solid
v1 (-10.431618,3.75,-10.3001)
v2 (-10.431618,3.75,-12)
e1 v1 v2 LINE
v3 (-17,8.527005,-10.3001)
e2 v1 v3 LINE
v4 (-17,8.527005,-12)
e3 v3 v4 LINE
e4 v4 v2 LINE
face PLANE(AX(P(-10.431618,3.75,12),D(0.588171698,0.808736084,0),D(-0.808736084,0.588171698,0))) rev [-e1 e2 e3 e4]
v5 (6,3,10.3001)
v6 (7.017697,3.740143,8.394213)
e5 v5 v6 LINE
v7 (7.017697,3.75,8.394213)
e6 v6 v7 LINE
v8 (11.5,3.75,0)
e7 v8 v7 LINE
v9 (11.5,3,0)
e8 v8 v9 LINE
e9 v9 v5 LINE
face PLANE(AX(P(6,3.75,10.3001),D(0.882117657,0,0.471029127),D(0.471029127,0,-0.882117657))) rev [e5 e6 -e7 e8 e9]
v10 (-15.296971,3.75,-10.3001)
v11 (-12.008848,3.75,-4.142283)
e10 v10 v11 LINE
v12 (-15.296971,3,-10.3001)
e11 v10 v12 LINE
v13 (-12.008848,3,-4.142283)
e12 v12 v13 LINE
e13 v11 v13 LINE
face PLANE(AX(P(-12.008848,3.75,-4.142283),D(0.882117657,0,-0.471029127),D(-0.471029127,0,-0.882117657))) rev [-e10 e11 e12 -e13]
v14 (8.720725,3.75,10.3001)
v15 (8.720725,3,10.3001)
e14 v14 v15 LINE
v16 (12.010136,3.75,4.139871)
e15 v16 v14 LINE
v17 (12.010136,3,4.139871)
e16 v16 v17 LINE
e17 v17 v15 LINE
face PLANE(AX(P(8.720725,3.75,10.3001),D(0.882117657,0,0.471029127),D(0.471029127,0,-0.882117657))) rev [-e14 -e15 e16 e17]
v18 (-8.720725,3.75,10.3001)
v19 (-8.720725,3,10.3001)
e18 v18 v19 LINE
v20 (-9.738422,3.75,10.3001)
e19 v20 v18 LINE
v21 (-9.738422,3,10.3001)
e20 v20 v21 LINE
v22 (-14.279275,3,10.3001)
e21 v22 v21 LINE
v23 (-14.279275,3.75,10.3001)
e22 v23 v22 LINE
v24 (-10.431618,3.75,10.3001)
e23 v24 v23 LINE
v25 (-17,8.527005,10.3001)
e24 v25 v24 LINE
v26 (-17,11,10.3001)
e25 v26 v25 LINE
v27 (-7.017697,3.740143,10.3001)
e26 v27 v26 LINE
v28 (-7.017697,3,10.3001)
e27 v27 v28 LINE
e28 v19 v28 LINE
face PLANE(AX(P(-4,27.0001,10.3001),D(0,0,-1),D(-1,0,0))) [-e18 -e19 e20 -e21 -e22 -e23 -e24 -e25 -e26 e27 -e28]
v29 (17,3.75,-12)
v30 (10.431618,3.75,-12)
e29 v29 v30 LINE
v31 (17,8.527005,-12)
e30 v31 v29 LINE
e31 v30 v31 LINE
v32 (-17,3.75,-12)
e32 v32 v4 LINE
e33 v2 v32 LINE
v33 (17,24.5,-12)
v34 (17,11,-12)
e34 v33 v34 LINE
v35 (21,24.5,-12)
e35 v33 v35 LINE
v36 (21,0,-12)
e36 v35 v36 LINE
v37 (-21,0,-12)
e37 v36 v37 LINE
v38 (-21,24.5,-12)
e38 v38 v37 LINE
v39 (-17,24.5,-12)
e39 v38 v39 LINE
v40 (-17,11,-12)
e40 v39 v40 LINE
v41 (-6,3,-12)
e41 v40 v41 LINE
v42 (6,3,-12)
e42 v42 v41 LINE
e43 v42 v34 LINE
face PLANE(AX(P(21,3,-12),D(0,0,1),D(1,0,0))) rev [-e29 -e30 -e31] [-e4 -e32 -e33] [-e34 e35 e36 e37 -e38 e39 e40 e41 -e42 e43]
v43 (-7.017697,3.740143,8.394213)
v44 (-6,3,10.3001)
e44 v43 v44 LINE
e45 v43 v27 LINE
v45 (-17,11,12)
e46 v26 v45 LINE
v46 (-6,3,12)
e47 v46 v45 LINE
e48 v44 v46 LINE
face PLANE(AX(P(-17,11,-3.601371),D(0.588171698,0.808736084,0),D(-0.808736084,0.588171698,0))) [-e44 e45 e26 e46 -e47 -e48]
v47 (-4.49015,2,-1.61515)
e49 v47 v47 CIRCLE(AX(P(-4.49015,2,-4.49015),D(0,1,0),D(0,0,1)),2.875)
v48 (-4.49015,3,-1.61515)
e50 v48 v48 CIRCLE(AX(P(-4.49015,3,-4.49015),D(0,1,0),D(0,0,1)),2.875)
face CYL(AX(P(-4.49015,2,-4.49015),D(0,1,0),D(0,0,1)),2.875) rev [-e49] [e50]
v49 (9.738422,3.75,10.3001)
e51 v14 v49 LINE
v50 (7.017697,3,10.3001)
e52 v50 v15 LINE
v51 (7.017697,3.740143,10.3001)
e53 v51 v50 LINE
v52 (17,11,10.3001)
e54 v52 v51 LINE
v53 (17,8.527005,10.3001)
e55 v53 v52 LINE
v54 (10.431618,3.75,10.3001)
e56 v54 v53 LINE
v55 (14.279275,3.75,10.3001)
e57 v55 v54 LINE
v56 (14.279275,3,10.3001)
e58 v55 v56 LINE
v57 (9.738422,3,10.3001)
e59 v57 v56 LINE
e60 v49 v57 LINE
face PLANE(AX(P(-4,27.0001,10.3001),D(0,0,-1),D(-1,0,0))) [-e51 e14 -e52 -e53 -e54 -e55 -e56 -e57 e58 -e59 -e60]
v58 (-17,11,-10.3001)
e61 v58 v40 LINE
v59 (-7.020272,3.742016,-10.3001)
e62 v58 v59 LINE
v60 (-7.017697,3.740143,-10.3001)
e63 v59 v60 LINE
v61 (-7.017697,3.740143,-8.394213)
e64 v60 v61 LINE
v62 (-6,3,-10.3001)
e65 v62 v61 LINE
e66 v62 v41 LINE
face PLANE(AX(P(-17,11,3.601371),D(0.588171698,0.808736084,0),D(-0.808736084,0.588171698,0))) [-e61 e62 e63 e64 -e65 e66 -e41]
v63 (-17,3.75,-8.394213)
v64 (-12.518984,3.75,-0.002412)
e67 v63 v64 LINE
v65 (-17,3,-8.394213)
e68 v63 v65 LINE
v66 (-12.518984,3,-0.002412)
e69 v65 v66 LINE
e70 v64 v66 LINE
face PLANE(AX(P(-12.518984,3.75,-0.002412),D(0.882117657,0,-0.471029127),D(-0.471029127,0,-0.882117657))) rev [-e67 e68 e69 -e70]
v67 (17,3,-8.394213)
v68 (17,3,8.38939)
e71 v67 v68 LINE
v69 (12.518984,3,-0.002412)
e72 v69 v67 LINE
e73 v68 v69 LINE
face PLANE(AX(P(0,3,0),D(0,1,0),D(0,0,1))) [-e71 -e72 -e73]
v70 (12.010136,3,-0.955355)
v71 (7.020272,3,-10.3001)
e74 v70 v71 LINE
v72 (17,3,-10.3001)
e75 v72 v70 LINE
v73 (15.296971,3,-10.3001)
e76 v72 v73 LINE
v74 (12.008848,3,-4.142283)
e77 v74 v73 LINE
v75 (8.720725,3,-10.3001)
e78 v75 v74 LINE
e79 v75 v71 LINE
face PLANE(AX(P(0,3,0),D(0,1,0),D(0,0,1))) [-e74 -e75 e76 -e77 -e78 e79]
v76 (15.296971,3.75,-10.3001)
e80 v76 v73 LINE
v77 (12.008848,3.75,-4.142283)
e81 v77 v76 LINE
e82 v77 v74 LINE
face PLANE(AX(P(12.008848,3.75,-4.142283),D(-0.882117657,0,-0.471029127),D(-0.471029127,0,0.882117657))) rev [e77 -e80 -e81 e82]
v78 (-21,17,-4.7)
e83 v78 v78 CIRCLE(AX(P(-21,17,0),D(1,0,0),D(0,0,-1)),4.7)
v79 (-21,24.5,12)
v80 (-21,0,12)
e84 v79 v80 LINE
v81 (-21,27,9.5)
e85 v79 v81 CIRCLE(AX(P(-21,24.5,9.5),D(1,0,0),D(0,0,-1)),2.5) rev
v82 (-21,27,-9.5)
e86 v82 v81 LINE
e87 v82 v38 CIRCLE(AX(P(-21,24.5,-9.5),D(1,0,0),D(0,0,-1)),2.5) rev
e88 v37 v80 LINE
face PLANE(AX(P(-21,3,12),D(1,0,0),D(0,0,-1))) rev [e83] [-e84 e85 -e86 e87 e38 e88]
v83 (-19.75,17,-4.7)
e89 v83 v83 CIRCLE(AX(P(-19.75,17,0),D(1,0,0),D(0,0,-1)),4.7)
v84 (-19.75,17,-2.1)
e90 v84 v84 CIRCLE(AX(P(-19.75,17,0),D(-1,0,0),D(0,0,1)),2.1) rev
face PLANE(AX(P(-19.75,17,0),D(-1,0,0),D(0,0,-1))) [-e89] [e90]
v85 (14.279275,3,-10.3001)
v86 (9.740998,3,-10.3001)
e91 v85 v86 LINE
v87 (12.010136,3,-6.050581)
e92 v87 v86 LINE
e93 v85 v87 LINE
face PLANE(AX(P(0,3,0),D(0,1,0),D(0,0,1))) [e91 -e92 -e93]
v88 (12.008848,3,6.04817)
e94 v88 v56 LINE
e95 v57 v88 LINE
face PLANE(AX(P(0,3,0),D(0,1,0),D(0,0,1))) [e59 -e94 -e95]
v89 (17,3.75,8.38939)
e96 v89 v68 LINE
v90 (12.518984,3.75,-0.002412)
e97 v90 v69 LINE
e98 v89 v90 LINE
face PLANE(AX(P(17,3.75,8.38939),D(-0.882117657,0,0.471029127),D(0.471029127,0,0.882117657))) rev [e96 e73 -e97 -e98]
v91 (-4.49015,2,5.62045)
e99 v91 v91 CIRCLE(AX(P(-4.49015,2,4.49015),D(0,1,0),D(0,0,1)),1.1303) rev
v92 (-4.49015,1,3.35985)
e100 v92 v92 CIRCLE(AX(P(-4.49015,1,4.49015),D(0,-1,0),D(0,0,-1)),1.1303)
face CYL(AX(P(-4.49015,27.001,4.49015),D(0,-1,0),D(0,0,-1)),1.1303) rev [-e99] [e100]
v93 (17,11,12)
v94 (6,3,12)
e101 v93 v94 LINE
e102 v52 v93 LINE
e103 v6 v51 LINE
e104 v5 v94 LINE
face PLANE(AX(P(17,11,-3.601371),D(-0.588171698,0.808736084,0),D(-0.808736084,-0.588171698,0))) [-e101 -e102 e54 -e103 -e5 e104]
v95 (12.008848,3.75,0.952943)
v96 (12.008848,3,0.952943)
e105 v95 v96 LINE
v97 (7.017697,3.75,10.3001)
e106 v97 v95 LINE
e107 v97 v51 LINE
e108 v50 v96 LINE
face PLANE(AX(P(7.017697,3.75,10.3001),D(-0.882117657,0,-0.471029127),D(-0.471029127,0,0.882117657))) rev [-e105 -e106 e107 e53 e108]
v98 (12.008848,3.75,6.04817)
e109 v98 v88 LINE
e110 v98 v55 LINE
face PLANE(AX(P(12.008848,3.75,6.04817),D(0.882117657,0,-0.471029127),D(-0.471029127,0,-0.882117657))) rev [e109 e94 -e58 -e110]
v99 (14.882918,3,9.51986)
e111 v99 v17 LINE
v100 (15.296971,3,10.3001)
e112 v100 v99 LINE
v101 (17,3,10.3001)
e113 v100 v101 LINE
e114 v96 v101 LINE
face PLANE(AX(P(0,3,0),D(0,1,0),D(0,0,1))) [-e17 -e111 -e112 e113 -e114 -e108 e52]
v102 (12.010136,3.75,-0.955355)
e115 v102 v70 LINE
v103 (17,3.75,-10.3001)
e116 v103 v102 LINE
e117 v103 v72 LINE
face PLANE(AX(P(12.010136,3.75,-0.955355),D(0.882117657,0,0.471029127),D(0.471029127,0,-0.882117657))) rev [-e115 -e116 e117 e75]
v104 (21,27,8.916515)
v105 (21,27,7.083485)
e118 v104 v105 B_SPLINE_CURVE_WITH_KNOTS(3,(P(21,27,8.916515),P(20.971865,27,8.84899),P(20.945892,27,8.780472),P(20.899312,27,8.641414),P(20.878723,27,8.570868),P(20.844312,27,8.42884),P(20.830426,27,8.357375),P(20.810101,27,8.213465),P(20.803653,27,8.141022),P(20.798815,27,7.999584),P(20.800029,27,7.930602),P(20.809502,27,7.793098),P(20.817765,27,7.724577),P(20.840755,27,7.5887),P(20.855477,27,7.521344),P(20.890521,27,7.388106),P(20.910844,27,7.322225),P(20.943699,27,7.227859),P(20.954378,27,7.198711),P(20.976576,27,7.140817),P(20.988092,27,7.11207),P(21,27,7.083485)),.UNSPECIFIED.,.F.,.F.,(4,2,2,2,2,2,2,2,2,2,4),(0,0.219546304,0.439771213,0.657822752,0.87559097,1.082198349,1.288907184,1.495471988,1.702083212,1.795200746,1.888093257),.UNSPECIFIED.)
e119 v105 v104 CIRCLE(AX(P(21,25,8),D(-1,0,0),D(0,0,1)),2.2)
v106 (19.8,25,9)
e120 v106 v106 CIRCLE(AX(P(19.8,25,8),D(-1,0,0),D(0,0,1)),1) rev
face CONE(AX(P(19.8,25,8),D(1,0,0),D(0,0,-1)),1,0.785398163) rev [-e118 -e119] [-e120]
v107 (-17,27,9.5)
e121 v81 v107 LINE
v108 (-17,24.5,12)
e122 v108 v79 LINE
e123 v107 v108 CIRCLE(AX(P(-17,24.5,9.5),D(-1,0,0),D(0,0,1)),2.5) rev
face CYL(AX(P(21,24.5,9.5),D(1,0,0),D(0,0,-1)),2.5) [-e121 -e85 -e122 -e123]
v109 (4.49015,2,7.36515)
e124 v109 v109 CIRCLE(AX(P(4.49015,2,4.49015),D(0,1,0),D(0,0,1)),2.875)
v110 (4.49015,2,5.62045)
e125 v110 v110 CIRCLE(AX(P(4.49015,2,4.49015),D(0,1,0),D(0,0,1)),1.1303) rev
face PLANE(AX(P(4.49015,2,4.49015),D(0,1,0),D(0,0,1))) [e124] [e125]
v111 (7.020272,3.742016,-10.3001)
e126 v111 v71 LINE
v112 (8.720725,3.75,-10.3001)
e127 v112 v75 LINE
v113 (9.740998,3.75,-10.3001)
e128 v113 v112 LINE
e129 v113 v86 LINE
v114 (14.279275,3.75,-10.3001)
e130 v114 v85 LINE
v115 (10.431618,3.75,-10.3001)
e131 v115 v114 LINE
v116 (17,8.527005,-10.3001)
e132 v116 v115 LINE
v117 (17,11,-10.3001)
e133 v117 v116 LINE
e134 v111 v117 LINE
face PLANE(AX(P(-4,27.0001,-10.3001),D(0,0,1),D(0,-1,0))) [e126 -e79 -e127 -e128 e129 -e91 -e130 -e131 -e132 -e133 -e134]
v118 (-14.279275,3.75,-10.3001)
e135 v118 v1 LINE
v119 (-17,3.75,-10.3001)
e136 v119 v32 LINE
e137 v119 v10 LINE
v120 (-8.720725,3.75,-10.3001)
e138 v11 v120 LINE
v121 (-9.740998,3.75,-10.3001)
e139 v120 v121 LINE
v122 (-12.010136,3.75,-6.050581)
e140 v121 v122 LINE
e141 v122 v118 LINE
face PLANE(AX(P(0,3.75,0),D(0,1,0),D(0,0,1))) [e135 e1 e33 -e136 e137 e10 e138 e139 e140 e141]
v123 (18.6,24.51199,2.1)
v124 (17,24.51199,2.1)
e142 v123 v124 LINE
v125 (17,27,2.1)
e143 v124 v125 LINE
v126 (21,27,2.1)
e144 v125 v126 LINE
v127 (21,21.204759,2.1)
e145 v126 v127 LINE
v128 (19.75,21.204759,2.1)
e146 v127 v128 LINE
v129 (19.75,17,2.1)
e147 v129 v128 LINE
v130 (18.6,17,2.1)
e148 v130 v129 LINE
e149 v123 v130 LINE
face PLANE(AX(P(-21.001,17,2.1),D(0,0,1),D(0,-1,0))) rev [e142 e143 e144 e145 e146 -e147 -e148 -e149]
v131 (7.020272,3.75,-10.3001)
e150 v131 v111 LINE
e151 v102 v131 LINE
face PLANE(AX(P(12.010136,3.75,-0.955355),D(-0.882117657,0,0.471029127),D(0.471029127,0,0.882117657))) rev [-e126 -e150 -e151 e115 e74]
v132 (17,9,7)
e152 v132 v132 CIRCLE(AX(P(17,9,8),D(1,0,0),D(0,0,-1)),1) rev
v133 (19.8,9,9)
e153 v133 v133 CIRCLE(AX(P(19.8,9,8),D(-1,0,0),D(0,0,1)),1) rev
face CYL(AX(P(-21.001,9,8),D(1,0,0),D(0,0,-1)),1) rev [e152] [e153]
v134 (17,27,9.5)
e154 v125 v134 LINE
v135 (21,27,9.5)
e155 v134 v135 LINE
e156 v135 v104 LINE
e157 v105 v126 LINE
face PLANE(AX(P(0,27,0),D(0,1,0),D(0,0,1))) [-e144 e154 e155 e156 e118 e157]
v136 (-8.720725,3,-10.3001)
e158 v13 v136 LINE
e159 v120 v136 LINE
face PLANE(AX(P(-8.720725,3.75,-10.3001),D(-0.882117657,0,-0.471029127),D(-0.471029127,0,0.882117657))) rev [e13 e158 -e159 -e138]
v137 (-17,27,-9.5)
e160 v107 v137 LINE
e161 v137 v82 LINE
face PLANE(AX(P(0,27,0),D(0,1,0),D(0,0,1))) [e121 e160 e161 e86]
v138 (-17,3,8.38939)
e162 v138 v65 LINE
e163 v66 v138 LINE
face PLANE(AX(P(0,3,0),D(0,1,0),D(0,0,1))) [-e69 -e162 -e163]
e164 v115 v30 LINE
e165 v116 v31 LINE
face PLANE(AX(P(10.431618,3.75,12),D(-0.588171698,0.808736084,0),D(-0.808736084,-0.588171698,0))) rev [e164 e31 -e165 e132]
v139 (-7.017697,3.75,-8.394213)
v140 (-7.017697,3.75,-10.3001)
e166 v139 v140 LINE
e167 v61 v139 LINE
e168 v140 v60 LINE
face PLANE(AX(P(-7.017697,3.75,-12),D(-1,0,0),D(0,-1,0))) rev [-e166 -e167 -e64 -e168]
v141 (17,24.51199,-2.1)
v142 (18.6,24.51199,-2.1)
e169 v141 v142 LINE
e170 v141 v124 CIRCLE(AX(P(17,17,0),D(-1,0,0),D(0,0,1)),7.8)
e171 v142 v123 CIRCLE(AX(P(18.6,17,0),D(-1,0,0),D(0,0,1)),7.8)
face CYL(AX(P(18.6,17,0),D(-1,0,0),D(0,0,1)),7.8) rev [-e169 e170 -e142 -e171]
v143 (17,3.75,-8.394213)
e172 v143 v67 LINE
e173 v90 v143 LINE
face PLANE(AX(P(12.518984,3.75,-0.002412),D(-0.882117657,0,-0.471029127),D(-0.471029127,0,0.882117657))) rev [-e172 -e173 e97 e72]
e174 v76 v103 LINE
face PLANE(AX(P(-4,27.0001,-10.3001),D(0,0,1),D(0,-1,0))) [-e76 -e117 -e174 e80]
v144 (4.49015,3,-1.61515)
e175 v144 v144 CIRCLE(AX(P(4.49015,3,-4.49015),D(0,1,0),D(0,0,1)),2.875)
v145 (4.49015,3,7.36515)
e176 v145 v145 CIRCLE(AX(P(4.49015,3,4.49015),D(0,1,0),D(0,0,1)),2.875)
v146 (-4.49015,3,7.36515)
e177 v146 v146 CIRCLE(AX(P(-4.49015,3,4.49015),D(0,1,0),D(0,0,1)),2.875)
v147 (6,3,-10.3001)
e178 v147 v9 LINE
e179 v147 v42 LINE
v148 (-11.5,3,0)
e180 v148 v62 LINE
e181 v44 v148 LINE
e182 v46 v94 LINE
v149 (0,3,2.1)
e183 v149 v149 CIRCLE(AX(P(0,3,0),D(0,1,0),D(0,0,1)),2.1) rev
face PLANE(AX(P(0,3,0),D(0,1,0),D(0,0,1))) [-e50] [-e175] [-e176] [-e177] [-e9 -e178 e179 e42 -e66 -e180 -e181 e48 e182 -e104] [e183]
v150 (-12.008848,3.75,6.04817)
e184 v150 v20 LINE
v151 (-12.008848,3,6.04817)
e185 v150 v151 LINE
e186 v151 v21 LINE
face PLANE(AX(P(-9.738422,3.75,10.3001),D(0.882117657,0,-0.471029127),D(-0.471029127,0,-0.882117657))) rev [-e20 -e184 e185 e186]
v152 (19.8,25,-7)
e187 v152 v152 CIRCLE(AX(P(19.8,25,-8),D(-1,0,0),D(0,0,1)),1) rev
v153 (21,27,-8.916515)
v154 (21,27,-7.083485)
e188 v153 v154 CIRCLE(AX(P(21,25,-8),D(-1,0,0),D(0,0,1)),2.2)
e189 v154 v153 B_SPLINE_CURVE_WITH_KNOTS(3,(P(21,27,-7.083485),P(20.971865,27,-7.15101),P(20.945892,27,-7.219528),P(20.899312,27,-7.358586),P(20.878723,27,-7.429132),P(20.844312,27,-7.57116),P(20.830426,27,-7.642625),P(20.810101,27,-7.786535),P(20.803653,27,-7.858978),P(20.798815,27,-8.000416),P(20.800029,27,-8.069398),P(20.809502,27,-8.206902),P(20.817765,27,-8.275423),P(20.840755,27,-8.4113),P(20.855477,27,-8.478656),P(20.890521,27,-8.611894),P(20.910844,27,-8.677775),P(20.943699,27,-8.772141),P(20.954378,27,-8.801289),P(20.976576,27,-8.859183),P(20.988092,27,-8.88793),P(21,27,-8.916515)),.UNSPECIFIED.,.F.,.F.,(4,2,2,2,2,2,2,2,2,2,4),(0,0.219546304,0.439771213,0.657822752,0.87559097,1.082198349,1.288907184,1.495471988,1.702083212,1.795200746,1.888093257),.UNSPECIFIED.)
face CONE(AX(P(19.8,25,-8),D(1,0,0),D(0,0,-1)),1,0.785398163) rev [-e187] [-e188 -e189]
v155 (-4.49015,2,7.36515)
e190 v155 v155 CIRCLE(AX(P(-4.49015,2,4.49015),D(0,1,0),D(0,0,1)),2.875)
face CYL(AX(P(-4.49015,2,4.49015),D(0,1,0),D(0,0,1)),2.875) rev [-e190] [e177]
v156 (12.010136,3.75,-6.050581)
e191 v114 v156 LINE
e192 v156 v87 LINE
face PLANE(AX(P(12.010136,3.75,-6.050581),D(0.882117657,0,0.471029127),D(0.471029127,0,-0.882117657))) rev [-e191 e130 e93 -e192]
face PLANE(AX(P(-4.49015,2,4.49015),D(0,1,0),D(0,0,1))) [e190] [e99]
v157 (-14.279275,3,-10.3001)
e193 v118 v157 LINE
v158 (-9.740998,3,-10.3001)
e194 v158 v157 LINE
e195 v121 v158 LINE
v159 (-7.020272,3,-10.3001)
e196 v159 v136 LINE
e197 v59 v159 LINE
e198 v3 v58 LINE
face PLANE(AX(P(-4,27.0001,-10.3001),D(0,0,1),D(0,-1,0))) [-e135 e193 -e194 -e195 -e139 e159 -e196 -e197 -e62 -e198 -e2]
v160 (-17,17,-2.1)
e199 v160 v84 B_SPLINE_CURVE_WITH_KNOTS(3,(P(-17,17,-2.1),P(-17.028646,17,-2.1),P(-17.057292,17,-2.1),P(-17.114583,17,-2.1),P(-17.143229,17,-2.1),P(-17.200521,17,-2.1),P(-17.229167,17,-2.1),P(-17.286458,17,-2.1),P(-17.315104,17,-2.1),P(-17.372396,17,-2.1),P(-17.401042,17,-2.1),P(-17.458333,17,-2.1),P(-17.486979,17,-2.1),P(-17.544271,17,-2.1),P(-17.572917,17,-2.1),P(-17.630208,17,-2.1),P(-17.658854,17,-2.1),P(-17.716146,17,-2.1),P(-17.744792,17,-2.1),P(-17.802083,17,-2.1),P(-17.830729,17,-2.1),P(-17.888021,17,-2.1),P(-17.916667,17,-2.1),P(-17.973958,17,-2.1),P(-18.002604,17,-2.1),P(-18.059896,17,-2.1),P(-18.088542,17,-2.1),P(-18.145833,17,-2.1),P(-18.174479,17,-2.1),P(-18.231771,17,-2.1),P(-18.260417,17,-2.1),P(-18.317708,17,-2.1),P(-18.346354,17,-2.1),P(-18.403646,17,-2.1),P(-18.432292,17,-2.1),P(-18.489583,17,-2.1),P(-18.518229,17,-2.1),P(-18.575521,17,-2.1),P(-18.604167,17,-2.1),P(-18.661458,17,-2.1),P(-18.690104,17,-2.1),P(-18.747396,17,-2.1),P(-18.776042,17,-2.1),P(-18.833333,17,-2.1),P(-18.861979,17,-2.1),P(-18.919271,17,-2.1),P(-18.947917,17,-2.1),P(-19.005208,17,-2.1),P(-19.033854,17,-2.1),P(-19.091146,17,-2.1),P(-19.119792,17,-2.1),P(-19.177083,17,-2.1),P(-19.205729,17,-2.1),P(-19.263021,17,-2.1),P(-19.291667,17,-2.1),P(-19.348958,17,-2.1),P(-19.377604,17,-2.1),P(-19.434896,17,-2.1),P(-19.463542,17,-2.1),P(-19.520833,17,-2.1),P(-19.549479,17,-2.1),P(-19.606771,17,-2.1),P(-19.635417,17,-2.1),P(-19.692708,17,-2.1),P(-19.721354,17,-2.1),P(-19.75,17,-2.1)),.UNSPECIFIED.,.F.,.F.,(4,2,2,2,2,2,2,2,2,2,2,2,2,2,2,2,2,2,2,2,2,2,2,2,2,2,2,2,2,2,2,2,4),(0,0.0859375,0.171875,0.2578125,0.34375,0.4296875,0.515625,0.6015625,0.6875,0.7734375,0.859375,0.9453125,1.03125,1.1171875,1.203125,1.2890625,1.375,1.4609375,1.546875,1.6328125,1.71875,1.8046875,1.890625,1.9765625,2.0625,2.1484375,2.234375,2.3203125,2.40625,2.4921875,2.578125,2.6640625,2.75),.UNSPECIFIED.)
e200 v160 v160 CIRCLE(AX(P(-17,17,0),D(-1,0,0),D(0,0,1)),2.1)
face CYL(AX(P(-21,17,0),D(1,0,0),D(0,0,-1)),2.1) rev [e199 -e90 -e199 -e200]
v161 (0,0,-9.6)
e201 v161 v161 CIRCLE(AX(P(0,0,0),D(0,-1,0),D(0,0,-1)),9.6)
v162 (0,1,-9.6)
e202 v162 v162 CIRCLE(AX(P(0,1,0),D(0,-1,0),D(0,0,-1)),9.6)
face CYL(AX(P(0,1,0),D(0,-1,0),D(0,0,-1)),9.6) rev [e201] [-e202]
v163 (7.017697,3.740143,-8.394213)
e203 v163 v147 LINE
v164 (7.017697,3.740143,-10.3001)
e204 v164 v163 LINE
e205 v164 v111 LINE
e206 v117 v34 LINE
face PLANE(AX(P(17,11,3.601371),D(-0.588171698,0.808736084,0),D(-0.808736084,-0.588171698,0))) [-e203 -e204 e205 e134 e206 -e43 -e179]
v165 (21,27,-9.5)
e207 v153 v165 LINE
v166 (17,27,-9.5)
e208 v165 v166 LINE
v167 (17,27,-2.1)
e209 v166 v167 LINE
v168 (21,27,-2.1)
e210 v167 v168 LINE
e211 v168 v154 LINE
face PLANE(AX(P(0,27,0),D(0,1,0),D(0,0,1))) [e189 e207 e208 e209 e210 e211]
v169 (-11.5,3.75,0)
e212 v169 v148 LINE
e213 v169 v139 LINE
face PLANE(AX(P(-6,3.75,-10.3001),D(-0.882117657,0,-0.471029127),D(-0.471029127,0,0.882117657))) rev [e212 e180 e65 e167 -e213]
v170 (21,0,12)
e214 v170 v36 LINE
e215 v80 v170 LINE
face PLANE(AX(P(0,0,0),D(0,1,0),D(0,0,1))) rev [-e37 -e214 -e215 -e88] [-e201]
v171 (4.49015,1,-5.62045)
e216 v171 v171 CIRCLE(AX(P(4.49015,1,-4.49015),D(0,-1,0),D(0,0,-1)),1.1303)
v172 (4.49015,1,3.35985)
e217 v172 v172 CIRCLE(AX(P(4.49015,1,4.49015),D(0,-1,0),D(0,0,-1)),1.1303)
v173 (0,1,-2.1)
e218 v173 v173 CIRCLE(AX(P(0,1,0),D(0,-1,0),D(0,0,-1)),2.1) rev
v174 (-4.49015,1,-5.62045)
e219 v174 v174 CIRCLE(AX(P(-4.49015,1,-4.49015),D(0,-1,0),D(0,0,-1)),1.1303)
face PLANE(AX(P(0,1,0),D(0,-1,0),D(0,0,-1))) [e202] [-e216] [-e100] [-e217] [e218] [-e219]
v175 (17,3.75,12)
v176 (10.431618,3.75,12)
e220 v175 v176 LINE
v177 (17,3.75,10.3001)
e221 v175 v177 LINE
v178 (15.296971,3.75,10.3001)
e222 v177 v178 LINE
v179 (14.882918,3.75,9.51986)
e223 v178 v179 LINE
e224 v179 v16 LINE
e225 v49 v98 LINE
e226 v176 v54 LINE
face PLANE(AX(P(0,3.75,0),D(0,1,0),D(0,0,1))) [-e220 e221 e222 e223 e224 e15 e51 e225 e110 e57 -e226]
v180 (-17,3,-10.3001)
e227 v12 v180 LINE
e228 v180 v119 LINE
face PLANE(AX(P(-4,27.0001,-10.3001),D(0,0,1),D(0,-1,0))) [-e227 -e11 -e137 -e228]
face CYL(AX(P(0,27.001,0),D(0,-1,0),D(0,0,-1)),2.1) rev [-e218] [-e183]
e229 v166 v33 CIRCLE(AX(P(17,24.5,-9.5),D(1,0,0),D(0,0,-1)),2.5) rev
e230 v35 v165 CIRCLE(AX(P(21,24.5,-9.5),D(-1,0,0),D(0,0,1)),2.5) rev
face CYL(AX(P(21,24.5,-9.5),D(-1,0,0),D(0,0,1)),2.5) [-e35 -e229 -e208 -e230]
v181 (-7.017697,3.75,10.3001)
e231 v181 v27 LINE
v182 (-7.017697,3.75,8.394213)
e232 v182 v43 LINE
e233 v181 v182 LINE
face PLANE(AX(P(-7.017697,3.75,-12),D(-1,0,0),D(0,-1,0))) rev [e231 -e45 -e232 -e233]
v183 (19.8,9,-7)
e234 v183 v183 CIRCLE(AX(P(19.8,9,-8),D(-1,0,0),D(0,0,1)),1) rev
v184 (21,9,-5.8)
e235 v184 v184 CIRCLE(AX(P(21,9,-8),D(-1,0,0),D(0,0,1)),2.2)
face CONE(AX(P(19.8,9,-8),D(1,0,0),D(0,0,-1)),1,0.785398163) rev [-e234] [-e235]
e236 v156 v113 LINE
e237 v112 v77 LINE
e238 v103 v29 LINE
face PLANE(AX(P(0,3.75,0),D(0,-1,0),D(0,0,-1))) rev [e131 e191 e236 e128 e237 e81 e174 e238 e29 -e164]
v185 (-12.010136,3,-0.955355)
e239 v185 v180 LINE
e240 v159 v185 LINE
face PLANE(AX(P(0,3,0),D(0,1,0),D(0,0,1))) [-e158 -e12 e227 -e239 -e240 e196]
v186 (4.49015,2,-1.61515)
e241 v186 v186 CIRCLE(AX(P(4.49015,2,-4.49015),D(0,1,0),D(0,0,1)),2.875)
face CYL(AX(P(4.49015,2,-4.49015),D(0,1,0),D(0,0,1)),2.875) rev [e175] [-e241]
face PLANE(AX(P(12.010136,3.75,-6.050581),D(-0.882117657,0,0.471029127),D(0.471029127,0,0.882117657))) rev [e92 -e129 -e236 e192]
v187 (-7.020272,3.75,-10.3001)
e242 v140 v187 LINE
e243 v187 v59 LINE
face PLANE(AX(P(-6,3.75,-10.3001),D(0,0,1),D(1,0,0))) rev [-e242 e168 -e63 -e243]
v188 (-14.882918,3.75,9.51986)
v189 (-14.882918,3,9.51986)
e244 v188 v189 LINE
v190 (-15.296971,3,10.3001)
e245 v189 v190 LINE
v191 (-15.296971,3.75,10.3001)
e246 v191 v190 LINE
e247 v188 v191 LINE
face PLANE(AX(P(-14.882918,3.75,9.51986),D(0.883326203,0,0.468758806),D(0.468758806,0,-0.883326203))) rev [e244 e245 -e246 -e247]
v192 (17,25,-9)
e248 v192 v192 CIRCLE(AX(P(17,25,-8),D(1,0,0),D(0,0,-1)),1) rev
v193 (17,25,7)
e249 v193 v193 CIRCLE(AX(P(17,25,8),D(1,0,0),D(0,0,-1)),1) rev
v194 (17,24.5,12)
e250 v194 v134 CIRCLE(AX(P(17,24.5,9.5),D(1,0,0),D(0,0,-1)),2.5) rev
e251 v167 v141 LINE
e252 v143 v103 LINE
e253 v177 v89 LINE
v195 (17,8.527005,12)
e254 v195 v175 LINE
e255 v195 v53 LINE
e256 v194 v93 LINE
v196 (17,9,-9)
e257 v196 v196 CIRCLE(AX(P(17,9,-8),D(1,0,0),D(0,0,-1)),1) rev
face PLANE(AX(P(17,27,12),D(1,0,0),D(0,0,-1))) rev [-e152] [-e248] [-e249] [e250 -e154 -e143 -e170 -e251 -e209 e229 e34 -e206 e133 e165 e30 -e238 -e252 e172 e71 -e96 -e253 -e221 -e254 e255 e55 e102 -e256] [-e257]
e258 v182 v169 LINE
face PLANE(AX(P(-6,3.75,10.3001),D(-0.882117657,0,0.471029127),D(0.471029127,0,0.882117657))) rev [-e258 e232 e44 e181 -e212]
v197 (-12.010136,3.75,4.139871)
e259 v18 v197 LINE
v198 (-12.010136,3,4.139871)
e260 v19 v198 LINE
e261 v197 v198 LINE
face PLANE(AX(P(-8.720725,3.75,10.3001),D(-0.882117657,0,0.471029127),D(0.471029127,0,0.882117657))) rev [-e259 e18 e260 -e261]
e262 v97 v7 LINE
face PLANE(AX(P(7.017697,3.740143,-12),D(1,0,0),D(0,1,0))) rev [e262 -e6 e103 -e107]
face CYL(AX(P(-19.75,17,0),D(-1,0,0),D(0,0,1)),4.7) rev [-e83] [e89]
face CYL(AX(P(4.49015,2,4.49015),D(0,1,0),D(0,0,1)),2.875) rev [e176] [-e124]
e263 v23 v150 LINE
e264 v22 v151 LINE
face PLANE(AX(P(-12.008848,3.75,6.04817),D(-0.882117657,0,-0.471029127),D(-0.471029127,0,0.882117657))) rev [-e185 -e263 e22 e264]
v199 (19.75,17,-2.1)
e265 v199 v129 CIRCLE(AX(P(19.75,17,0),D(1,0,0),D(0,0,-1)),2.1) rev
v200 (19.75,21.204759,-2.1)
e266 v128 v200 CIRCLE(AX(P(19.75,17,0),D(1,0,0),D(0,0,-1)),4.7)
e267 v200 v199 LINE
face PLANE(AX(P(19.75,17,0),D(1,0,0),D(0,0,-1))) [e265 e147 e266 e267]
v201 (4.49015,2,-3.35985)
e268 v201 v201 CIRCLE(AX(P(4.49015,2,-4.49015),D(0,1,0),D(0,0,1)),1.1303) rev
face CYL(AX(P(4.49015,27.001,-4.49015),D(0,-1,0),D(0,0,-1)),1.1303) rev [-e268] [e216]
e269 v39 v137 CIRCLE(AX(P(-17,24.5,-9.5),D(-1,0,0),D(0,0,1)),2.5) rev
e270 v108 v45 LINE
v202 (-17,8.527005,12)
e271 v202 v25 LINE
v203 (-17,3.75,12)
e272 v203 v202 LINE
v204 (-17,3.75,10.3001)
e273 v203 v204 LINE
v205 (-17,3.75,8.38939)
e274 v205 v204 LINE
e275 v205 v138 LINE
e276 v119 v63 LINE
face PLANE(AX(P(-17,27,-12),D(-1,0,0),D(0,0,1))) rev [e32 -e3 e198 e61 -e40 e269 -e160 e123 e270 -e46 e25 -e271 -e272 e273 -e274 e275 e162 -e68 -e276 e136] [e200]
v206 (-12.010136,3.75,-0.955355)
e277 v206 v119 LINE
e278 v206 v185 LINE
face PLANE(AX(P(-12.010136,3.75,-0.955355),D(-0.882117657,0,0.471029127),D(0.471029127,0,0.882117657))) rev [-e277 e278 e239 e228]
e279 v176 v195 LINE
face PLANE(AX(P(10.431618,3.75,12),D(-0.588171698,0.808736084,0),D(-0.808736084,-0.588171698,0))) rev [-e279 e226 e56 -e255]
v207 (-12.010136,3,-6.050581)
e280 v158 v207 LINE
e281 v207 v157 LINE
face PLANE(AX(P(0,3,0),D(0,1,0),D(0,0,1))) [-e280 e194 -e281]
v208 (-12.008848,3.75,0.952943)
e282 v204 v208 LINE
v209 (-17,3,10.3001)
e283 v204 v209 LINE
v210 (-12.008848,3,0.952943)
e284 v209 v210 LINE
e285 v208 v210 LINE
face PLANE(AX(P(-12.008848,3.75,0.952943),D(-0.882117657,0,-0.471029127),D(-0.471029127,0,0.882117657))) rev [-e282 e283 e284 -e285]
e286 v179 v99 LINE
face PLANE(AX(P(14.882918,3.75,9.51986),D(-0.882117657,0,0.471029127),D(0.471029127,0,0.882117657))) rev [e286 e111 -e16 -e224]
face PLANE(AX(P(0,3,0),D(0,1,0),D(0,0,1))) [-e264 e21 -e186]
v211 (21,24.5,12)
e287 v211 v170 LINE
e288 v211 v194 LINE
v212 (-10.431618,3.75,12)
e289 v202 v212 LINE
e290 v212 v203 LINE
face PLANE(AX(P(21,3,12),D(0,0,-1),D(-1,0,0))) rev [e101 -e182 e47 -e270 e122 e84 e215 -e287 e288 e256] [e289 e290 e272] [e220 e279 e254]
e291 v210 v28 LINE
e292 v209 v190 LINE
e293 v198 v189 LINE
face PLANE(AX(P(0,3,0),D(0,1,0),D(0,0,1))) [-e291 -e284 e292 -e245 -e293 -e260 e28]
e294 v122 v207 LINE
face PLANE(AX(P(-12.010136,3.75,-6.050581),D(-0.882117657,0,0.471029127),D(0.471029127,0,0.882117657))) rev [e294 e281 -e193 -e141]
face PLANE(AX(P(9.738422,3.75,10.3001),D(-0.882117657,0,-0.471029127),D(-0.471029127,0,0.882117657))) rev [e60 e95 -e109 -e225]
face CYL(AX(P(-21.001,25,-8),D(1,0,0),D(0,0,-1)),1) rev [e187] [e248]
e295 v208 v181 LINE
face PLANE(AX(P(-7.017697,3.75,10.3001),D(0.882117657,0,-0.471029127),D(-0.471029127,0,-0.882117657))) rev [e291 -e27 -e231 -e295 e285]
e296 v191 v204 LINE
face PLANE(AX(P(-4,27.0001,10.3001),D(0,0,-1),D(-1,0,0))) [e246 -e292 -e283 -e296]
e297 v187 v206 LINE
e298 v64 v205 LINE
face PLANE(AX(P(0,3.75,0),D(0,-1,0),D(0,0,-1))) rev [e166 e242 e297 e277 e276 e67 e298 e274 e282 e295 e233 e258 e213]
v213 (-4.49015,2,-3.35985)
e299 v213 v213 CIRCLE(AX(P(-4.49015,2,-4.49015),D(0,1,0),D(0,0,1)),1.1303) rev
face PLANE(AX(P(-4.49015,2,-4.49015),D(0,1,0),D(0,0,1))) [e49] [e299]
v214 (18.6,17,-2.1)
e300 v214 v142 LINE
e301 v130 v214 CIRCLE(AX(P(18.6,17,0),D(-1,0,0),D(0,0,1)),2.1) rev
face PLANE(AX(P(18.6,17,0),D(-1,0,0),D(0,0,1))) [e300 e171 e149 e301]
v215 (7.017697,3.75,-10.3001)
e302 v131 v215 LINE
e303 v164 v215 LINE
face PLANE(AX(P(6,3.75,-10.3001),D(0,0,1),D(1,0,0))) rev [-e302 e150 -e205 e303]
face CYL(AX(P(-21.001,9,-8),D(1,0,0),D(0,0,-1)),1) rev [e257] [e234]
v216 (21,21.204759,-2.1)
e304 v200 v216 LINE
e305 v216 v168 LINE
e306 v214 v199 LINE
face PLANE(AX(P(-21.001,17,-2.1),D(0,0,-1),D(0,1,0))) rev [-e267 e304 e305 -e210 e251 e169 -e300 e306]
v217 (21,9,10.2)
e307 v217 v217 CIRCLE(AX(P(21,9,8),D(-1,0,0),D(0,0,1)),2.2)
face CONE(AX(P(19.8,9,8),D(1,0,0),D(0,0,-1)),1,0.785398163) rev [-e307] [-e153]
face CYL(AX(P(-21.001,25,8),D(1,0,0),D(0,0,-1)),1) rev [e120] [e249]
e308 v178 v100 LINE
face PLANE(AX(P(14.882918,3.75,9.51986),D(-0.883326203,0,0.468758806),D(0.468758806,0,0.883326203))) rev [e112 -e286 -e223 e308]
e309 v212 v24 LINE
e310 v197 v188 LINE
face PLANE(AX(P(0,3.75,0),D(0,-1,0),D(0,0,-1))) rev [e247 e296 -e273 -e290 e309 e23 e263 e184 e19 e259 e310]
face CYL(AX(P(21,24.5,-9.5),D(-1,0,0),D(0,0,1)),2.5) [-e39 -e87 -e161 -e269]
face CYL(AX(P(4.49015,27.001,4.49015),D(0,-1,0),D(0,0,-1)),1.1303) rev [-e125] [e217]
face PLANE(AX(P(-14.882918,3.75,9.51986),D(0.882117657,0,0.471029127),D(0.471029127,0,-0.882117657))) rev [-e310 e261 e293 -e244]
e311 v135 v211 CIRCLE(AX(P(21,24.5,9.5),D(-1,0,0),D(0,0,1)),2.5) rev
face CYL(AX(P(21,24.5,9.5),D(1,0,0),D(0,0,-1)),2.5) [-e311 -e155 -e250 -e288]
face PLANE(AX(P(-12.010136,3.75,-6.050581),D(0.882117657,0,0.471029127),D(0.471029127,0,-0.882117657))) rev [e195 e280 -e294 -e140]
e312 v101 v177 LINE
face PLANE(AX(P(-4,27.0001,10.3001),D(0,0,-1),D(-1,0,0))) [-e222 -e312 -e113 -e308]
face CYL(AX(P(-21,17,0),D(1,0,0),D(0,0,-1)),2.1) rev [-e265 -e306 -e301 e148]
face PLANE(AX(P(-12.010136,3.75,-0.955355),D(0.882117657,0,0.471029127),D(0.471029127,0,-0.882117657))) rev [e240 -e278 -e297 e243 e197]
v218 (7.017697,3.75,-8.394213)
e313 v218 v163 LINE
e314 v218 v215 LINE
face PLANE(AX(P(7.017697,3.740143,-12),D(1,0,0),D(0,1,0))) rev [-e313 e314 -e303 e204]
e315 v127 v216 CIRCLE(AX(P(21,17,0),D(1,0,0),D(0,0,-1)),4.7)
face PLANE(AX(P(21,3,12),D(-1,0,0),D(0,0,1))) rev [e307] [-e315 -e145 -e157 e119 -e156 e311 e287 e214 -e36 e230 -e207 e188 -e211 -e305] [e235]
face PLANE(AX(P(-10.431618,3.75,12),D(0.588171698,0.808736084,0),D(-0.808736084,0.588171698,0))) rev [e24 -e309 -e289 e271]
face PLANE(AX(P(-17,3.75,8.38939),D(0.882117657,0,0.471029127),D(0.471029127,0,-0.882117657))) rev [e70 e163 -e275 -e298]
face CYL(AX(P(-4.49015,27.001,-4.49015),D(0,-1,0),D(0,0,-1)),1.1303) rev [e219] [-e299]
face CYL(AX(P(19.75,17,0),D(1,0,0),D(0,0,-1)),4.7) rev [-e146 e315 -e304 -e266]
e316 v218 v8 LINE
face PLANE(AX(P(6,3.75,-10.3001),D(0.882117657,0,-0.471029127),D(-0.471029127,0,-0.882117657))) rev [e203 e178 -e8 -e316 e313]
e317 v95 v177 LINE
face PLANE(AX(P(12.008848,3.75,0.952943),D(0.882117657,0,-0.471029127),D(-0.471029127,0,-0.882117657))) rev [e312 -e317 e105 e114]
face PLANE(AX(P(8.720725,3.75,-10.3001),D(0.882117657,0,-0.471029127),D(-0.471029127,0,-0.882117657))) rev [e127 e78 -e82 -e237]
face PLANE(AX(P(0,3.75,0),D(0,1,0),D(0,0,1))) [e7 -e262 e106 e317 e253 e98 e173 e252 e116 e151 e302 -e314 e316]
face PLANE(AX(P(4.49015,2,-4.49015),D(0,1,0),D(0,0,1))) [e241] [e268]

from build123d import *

# Parameters (mm, degrees)
SKETCH1_W           = 42
SKETCH1_H           = 24
BOSS_EXTRUDE1_DEPTH = 3
SKETCH2_W           = 4
SKETCH2_H           = 24
BOSS_EXTRUDE2_DEPTH = 24
SKETCH3_R           = 2.1
CUT_EXTRUDE1_DEPTH  = 52.351728306
SKETCH4_R           = 7.8
CUT_EXTRUDE2_DEPTH  = 1.6
CUT_EXTRUDE3_REACH  = 53.352
SKETCH5_R           = 1
CHAMFER1_SIZE       = 1.2
FILLET1_R           = 2.5
FILLET2_R           = 2.5
FILLET3_R           = 2.5
FILLET4_R           = 2.5
CUT_EXTRUDE4_REACH  = 38.249
SKETCH6_R           = 2.1
SKETCH7_R           = 4.7
CUT_EXTRUDE5_DEPTH  = 1.25
BOSS_EXTRUDE3_DEPTH = 1.6999
CUT_EXTRUDE6_REACH  = 53.352
BOSS_EXTRUDE4_DEPTH = 1.6999
SKETCH12_R          = 9.6
CUT_EXTRUDE7_DEPTH  = 1
CUT_EXTRUDE8_REACH  = 37.511
SKETCH13_R          = 1.1303
BOSS_EXTRUDE5_DEPTH = 0.75
CUT_EXTRUDE9_DEPTH  = 41.832517189
CUT_EXTRUDE10_DEPTH = 41.832517189
CUT_EXTRUDE11_DEPTH = 42.785164832
SKETCH19_R          = 2.875
CUT_EXTRUDE12_DEPTH = 1


with BuildPart() as part:
    # Sketch1 → Boss-Extrude1 (new body)
    with BuildSketch(Plane(origin=(0, 0, 0), x_dir=(1, 0, 0), z_dir=(0, 1, 0))):
        Rectangle(SKETCH1_W, SKETCH1_H)
    extrude(amount=BOSS_EXTRUDE1_DEPTH)

    # Sketch2 → Boss-Extrude2 (add)
    with BuildSketch(Plane(origin=(0, 3, 0), x_dir=(1, 0, 0), z_dir=(0, 1, 0))):
        with Locations((19, 0)):
            Rectangle(SKETCH2_W, SKETCH2_H)
        with Locations((-19, 0)):
            Rectangle(SKETCH2_W, SKETCH2_H)
    extrude(amount=BOSS_EXTRUDE2_DEPTH)

    # Sketch3 → Cut-Extrude1 (cut, through all)
    with BuildSketch(Plane(origin=(21, 0, 0), x_dir=(0, 0, -1), z_dir=(1, 0, 0))):
        with Locations((0, 17)):
            Circle(SKETCH3_R)
    extrude(amount=-CUT_EXTRUDE1_DEPTH, mode=Mode.SUBTRACT)

    # Sketch4 → Cut-Extrude2 (cut)
    with BuildSketch(Plane.ZY.offset(-17)):
        with Locations((0, 17)):
            Circle(SKETCH4_R)
    extrude(amount=-CUT_EXTRUDE2_DEPTH, mode=Mode.SUBTRACT)

    # Sketch5 → Cut-Extrude3 (cut, up to next)
    with BuildSketch(Plane(origin=(21, 0, 0), x_dir=(0, 0, -1), z_dir=(1, 0, 0)), mode=Mode.PRIVATE) as cut_extrude3_sk1:
        with Locations((-8, 25)):
            Circle(SKETCH5_R)
    cut_extrude3_tool1 = extrude(cut_extrude3_sk1.sketch, amount=-CUT_EXTRUDE3_REACH, mode=Mode.PRIVATE) & part.part
    # Sketch5 → Cut-Extrude3 (cut, up to next)
    with BuildSketch(Plane(origin=(21, 0, 0), x_dir=(0, 0, -1), z_dir=(1, 0, 0)), mode=Mode.PRIVATE) as cut_extrude3_sk2:
        with Locations((8, 25)):
            Circle(SKETCH5_R)
    cut_extrude3_tool2 = extrude(cut_extrude3_sk2.sketch, amount=-CUT_EXTRUDE3_REACH, mode=Mode.PRIVATE) & part.part
    # Sketch5 → Cut-Extrude3 (cut, up to next)
    with BuildSketch(Plane(origin=(21, 0, 0), x_dir=(0, 0, -1), z_dir=(1, 0, 0)), mode=Mode.PRIVATE) as cut_extrude3_sk3:
        with Locations((8, 9)):
            Circle(SKETCH5_R)
    cut_extrude3_tool3 = extrude(cut_extrude3_sk3.sketch, amount=-CUT_EXTRUDE3_REACH, mode=Mode.PRIVATE) & part.part
    # Sketch5 → Cut-Extrude3 (cut, up to next)
    with BuildSketch(Plane(origin=(21, 0, 0), x_dir=(0, 0, -1), z_dir=(1, 0, 0)), mode=Mode.PRIVATE) as cut_extrude3_sk4:
        with Locations((-8, 9)):
            Circle(SKETCH5_R)
    cut_extrude3_tool4 = extrude(cut_extrude3_sk4.sketch, amount=-CUT_EXTRUDE3_REACH, mode=Mode.PRIVATE) & part.part
    add(cut_extrude3_tool1.solids().sort_by_distance((21, 25, 8))[0], mode=Mode.SUBTRACT)
    add(cut_extrude3_tool2.solids().sort_by_distance((21, 25, -8))[0], mode=Mode.SUBTRACT)
    add(cut_extrude3_tool3.solids().sort_by_distance((21, 9, -8))[0], mode=Mode.SUBTRACT)
    add(cut_extrude3_tool4.solids().sort_by_distance((21, 9, 8))[0], mode=Mode.SUBTRACT)

    # Chamfer1
    # the kernel refuses this chamfer: 1.2 mm, written as the material it takes off along each edge
    with BuildSketch(Plane(origin=(21, 9, 8), x_dir=(0, 0, -1), z_dir=(0, -1, 0))) as chamfer1_piece_1:
        Polygon((1 + CHAMFER1_SIZE, 0), (1, -CHAMFER1_SIZE), (1, 0), align=None)
    revolve(axis=Axis((21, 9, 8), (1, 0, 0)), mode=Mode.SUBTRACT)
    with BuildSketch(Plane(origin=(21, 9, -8), x_dir=(0, 0, -1), z_dir=(0, -1, 0))) as chamfer1_piece_2:
        Polygon((1 + CHAMFER1_SIZE, 0), (1, -CHAMFER1_SIZE), (1, 0), align=None)
    revolve(axis=Axis((21, 9, -8), (1, 0, 0)), mode=Mode.SUBTRACT)
    with BuildSketch(Plane(origin=(21, 25, -8), x_dir=(0, 0, -1), z_dir=(0, -1, 0))) as chamfer1_piece_3:
        Polygon((1 + CHAMFER1_SIZE, 0), (1, -CHAMFER1_SIZE), (1, 0), align=None)
    revolve(axis=Axis((21, 25, -8), (1, 0, 0)), mode=Mode.SUBTRACT)
    with BuildSketch(Plane(origin=(21, 25, 8), x_dir=(0, 0, -1), z_dir=(0, -1, 0))) as chamfer1_piece_4:
        Polygon((1 + CHAMFER1_SIZE, 0), (1, -CHAMFER1_SIZE), (1, 0), align=None)
    revolve(axis=Axis((21, 25, 8), (1, 0, 0)), mode=Mode.SUBTRACT)

    # Fillet1
    fillet1_edges = [part.edges().sort_by_distance(p)[0] for p in [
        (19, 27, 12),
    ]]
    fillet(fillet1_edges, radius=FILLET1_R)

    # Fillet2
    fillet2_edges = [part.edges().sort_by_distance(p)[0] for p in [
        (19, 27, -12),
    ]]
    fillet(fillet2_edges, radius=FILLET2_R)

    # Fillet3
    fillet3_edges = [part.edges().sort_by_distance(p)[0] for p in [
        (-19, 27, -12),
    ]]
    fillet(fillet3_edges, radius=FILLET3_R)

    # Fillet4
    fillet4_edges = [part.edges().sort_by_distance(p)[0] for p in [
        (-19, 27, 12),
    ]]
    fillet(fillet4_edges, radius=FILLET4_R)

    # Sketch6 → Cut-Extrude4 (cut, up to next)
    with BuildSketch(Plane.XZ, mode=Mode.PRIVATE) as cut_extrude4_sk1:
        with Locations(Location((0, 0, 0), (0, 0, 270))):
            Circle(SKETCH6_R)
    cut_extrude4_tool1 = extrude(cut_extrude4_sk1.sketch, amount=-CUT_EXTRUDE4_REACH, mode=Mode.PRIVATE) & part.part
    add(cut_extrude4_tool1.solids().sort_by_distance((0, 0, 0))[0], mode=Mode.SUBTRACT)

    # Sketch7 → Cut-Extrude5 (cut)
    with BuildSketch(Plane(origin=(21, 0, 0), x_dir=(0, 0, -1), z_dir=(1, 0, 0))):
        with Locations((0, 17)):
            Circle(SKETCH7_R)
    cut_extrude5 = extrude(amount=-CUT_EXTRUDE5_DEPTH, mode=Mode.SUBTRACT)

    # Mirror1: Cut-Extrude5 across plane
    add(cut_extrude5.mirror(Plane(origin=(0, 0, 0), x_dir=(0, 0, 1), z_dir=(1, 0, 0))), mode=Mode.SUBTRACT)

    # Sketch9 → Boss-Extrude3 (add)
    with BuildSketch(Plane.XY.offset(12)):
        Polygon((-17, 3), (-17, 11), (-6, 3), align=None)
        Polygon((17, 11), (6, 3), (17, 3), align=None)
    extrude(amount=-BOSS_EXTRUDE3_DEPTH)

    # Sketch10 → Cut-Extrude6 (cut, up to next)
    with BuildSketch(Plane(origin=(21, 0, 0), x_dir=(0, 0, -1), z_dir=(1, 0, 0)), mode=Mode.PRIVATE) as cut_extrude6_sk1:
        with BuildLine():
            Line((2.1, 17), (2.1, 27))
            Line((2.1, 27), (-2.1, 27))
            Line((-2.1, 27), (-2.1, 17))
            ThreePointArc((-2.1, 17), (0, 14.9), (2.1, 17))
        make_face()
    cut_extrude6_tool1 = extrude(cut_extrude6_sk1.sketch, amount=-CUT_EXTRUDE6_REACH, mode=Mode.PRIVATE) & part.part
    add(cut_extrude6_tool1.solids().sort_by_distance((21, 21.165903, 0))[0], mode=Mode.SUBTRACT)

    # Sketch11 → Boss-Extrude4 (add)
    with BuildSketch(Plane(origin=(0, 0, -12), x_dir=(-1, 0, 0), z_dir=(0, 0, -1))):
        Polygon((-17, 3), (-17, 11), (-6, 3), align=None)
        Polygon((17, 11), (6, 3), (17, 3), align=None)
    extrude(amount=-BOSS_EXTRUDE4_DEPTH)

    # Sketch12 → Cut-Extrude7 (cut)
    with BuildSketch(Plane.XZ):
        with Locations(Location((0, 0, 0), (0, 0, 270))):
            Circle(SKETCH12_R)
    extrude(amount=-CUT_EXTRUDE7_DEPTH, mode=Mode.SUBTRACT)

    # Sketch13 → Cut-Extrude8 (cut, up to next)
    with BuildSketch(Plane.XZ.offset(-1), mode=Mode.PRIVATE) as cut_extrude8_sk1:
        with Locations(Location((-4.49015, 4.49015, 0), (0, 0, 270))):
            Circle(SKETCH13_R)
    cut_extrude8_tool1 = extrude(cut_extrude8_sk1.sketch, amount=-CUT_EXTRUDE8_REACH, mode=Mode.PRIVATE) & part.part
    # Sketch13 → Cut-Extrude8 (cut, up to next)
    with BuildSketch(Plane.XZ.offset(-1), mode=Mode.PRIVATE) as cut_extrude8_sk2:
        with Locations(Location((4.49015, 4.49015, 0), (0, 0, 270))):
            Circle(SKETCH13_R)
    cut_extrude8_tool2 = extrude(cut_extrude8_sk2.sketch, amount=-CUT_EXTRUDE8_REACH, mode=Mode.PRIVATE) & part.part
    # Sketch13 → Cut-Extrude8 (cut, up to next)
    with BuildSketch(Plane.XZ.offset(-1), mode=Mode.PRIVATE) as cut_extrude8_sk3:
        with Locations(Location((4.49015, -4.49015, 0), (0, 0, 270))):
            Circle(SKETCH13_R)
    cut_extrude8_tool3 = extrude(cut_extrude8_sk3.sketch, amount=-CUT_EXTRUDE8_REACH, mode=Mode.PRIVATE) & part.part
    # Sketch13 → Cut-Extrude8 (cut, up to next)
    with BuildSketch(Plane.XZ.offset(-1), mode=Mode.PRIVATE) as cut_extrude8_sk4:
        with Locations(Location((-4.49015, -4.49015, 0), (0, 0, 270))):
            Circle(SKETCH13_R)
    cut_extrude8_tool4 = extrude(cut_extrude8_sk4.sketch, amount=-CUT_EXTRUDE8_REACH, mode=Mode.PRIVATE) & part.part
    add(cut_extrude8_tool1.solids().sort_by_distance((-4.49015, 1, 4.49015))[0], mode=Mode.SUBTRACT)
    add(cut_extrude8_tool2.solids().sort_by_distance((4.49015, 1, 4.49015))[0], mode=Mode.SUBTRACT)
    add(cut_extrude8_tool3.solids().sort_by_distance((4.49015, 1, -4.49015))[0], mode=Mode.SUBTRACT)
    add(cut_extrude8_tool4.solids().sort_by_distance((-4.49015, 1, -4.49015))[0], mode=Mode.SUBTRACT)

    # Sketch14 → Boss-Extrude5 (add)
    with BuildSketch(Plane(origin=(0, 3, 0), x_dir=(1, 0, 0), z_dir=(0, 1, 0))):
        Polygon((-6, 10.3001), (-11.5, 0), (-6, -10.3001), (-7.01769667, -10.3001), (-12.008848335, -0.952943406), (-17, -10.3001), (-17, -8.389390136), (-12.518984365, 0.002411526), (-17, 8.394213188), (-17, 10.3001), (-12.01013603, 0.955354932), (-7.020272061, 10.3001), align=None)
        Polygon((-9.738422165, -10.3001), (-12.008848335, -6.048169711), (-14.279274505, -10.3001), (-15.296971174, -10.3001), (-14.882917623, -9.519860041), (-12.01013603, -4.139871373), (-8.720725495, -10.3001), align=None)
        Polygon((-8.720725495, 10.3001), (-9.740997556, 10.3001), (-12.01013603, 6.050581237), (-14.279274505, 10.3001), (-15.296971174, 10.3001), (-12.008848335, 4.142282899), align=None)
        Polygon((14.882917623, -9.519860041), (12.01013603, -4.139871373), (8.720725495, -10.3001), (9.738422165, -10.3001), (12.008848335, -6.048169711), (14.279274505, -10.3001), (15.296971174, -10.3001), align=None)
        Polygon((12.01013603, 6.050581237), (9.740997556, 10.3001), (8.720725495, 10.3001), (12.008848335, 4.142282899), (15.296971174, 10.3001), (14.279274505, 10.3001), align=None)
        Polygon((12.008848335, -0.952943406), (17, -10.3001), (17, -8.389390136), (12.518984365, 0.002411526), (17, 8.394213188), (17, 10.3001), (12.01013603, 0.955354932), (7.020272061, 10.3001), (6, 10.3001), (11.5, 0), (6, -10.3001), (7.01769667, -10.3001), align=None)
    extrude(amount=BOSS_EXTRUDE5_DEPTH)

    # Sketch16 → Cut-Extrude9 (cut, through all)
    with BuildSketch(Plane.XY.offset(10.3001)):
        Polygon((-7.01769667, 3.740143032), (-6, 3), (-6, 3.75), (-7.01769667, 3.75), align=None)
    extrude(amount=-CUT_EXTRUDE9_DEPTH, mode=Mode.SUBTRACT)

    # Sketch17 → Cut-Extrude10 (cut, through all)
    with BuildSketch(Plane.XY.offset(10.3001)):
        Polygon((6, 3), (7.01769667, 3.740143032), (7.01769667, 3.75), (6, 3.75), align=None)
    extrude(amount=-CUT_EXTRUDE10_DEPTH, mode=Mode.SUBTRACT)

    # Sketch18 → Cut-Extrude11 (cut, through all)
    with BuildSketch(Plane(origin=(0, 0, -12), x_dir=(-1, 0, 0), z_dir=(0, 0, -1))):
        Polygon((15.296971174, 3.75), (17, 3.75), (17, 8.527005362), (10.431617627, 3.75), (14.279274505, 3.75), align=None)
        Polygon((-10.431617627, 3.75), (-17, 8.527005362), (-17, 3.75), (-15.296971174, 3.75), (-14.279274505, 3.75), align=None)
    extrude(amount=-CUT_EXTRUDE11_DEPTH, mode=Mode.SUBTRACT)

    # Sketch19 → Cut-Extrude12 (cut)
    with BuildSketch(Plane(origin=(0, 3, 0), x_dir=(1, 0, 0), z_dir=(0, 1, 0))):
        with Locations(Location((-4.49015, -4.49015, 0), (0, 0, 270))):
            Circle(SKETCH19_R)
        with Locations(Location((4.49015, -4.49015, 0), (0, 0, 270))):
            Circle(SKETCH19_R)
        with Locations(Location((-4.49015, 4.49015, 0), (0, 0, 270))):
            Circle(SKETCH19_R)
        with Locations(Location((4.49015, 4.49015, 0), (0, 0, 270))):
            Circle(SKETCH19_R)
    extrude(amount=-CUT_EXTRUDE12_DEPTH, mode=Mode.SUBTRACT)


solid = part.part
